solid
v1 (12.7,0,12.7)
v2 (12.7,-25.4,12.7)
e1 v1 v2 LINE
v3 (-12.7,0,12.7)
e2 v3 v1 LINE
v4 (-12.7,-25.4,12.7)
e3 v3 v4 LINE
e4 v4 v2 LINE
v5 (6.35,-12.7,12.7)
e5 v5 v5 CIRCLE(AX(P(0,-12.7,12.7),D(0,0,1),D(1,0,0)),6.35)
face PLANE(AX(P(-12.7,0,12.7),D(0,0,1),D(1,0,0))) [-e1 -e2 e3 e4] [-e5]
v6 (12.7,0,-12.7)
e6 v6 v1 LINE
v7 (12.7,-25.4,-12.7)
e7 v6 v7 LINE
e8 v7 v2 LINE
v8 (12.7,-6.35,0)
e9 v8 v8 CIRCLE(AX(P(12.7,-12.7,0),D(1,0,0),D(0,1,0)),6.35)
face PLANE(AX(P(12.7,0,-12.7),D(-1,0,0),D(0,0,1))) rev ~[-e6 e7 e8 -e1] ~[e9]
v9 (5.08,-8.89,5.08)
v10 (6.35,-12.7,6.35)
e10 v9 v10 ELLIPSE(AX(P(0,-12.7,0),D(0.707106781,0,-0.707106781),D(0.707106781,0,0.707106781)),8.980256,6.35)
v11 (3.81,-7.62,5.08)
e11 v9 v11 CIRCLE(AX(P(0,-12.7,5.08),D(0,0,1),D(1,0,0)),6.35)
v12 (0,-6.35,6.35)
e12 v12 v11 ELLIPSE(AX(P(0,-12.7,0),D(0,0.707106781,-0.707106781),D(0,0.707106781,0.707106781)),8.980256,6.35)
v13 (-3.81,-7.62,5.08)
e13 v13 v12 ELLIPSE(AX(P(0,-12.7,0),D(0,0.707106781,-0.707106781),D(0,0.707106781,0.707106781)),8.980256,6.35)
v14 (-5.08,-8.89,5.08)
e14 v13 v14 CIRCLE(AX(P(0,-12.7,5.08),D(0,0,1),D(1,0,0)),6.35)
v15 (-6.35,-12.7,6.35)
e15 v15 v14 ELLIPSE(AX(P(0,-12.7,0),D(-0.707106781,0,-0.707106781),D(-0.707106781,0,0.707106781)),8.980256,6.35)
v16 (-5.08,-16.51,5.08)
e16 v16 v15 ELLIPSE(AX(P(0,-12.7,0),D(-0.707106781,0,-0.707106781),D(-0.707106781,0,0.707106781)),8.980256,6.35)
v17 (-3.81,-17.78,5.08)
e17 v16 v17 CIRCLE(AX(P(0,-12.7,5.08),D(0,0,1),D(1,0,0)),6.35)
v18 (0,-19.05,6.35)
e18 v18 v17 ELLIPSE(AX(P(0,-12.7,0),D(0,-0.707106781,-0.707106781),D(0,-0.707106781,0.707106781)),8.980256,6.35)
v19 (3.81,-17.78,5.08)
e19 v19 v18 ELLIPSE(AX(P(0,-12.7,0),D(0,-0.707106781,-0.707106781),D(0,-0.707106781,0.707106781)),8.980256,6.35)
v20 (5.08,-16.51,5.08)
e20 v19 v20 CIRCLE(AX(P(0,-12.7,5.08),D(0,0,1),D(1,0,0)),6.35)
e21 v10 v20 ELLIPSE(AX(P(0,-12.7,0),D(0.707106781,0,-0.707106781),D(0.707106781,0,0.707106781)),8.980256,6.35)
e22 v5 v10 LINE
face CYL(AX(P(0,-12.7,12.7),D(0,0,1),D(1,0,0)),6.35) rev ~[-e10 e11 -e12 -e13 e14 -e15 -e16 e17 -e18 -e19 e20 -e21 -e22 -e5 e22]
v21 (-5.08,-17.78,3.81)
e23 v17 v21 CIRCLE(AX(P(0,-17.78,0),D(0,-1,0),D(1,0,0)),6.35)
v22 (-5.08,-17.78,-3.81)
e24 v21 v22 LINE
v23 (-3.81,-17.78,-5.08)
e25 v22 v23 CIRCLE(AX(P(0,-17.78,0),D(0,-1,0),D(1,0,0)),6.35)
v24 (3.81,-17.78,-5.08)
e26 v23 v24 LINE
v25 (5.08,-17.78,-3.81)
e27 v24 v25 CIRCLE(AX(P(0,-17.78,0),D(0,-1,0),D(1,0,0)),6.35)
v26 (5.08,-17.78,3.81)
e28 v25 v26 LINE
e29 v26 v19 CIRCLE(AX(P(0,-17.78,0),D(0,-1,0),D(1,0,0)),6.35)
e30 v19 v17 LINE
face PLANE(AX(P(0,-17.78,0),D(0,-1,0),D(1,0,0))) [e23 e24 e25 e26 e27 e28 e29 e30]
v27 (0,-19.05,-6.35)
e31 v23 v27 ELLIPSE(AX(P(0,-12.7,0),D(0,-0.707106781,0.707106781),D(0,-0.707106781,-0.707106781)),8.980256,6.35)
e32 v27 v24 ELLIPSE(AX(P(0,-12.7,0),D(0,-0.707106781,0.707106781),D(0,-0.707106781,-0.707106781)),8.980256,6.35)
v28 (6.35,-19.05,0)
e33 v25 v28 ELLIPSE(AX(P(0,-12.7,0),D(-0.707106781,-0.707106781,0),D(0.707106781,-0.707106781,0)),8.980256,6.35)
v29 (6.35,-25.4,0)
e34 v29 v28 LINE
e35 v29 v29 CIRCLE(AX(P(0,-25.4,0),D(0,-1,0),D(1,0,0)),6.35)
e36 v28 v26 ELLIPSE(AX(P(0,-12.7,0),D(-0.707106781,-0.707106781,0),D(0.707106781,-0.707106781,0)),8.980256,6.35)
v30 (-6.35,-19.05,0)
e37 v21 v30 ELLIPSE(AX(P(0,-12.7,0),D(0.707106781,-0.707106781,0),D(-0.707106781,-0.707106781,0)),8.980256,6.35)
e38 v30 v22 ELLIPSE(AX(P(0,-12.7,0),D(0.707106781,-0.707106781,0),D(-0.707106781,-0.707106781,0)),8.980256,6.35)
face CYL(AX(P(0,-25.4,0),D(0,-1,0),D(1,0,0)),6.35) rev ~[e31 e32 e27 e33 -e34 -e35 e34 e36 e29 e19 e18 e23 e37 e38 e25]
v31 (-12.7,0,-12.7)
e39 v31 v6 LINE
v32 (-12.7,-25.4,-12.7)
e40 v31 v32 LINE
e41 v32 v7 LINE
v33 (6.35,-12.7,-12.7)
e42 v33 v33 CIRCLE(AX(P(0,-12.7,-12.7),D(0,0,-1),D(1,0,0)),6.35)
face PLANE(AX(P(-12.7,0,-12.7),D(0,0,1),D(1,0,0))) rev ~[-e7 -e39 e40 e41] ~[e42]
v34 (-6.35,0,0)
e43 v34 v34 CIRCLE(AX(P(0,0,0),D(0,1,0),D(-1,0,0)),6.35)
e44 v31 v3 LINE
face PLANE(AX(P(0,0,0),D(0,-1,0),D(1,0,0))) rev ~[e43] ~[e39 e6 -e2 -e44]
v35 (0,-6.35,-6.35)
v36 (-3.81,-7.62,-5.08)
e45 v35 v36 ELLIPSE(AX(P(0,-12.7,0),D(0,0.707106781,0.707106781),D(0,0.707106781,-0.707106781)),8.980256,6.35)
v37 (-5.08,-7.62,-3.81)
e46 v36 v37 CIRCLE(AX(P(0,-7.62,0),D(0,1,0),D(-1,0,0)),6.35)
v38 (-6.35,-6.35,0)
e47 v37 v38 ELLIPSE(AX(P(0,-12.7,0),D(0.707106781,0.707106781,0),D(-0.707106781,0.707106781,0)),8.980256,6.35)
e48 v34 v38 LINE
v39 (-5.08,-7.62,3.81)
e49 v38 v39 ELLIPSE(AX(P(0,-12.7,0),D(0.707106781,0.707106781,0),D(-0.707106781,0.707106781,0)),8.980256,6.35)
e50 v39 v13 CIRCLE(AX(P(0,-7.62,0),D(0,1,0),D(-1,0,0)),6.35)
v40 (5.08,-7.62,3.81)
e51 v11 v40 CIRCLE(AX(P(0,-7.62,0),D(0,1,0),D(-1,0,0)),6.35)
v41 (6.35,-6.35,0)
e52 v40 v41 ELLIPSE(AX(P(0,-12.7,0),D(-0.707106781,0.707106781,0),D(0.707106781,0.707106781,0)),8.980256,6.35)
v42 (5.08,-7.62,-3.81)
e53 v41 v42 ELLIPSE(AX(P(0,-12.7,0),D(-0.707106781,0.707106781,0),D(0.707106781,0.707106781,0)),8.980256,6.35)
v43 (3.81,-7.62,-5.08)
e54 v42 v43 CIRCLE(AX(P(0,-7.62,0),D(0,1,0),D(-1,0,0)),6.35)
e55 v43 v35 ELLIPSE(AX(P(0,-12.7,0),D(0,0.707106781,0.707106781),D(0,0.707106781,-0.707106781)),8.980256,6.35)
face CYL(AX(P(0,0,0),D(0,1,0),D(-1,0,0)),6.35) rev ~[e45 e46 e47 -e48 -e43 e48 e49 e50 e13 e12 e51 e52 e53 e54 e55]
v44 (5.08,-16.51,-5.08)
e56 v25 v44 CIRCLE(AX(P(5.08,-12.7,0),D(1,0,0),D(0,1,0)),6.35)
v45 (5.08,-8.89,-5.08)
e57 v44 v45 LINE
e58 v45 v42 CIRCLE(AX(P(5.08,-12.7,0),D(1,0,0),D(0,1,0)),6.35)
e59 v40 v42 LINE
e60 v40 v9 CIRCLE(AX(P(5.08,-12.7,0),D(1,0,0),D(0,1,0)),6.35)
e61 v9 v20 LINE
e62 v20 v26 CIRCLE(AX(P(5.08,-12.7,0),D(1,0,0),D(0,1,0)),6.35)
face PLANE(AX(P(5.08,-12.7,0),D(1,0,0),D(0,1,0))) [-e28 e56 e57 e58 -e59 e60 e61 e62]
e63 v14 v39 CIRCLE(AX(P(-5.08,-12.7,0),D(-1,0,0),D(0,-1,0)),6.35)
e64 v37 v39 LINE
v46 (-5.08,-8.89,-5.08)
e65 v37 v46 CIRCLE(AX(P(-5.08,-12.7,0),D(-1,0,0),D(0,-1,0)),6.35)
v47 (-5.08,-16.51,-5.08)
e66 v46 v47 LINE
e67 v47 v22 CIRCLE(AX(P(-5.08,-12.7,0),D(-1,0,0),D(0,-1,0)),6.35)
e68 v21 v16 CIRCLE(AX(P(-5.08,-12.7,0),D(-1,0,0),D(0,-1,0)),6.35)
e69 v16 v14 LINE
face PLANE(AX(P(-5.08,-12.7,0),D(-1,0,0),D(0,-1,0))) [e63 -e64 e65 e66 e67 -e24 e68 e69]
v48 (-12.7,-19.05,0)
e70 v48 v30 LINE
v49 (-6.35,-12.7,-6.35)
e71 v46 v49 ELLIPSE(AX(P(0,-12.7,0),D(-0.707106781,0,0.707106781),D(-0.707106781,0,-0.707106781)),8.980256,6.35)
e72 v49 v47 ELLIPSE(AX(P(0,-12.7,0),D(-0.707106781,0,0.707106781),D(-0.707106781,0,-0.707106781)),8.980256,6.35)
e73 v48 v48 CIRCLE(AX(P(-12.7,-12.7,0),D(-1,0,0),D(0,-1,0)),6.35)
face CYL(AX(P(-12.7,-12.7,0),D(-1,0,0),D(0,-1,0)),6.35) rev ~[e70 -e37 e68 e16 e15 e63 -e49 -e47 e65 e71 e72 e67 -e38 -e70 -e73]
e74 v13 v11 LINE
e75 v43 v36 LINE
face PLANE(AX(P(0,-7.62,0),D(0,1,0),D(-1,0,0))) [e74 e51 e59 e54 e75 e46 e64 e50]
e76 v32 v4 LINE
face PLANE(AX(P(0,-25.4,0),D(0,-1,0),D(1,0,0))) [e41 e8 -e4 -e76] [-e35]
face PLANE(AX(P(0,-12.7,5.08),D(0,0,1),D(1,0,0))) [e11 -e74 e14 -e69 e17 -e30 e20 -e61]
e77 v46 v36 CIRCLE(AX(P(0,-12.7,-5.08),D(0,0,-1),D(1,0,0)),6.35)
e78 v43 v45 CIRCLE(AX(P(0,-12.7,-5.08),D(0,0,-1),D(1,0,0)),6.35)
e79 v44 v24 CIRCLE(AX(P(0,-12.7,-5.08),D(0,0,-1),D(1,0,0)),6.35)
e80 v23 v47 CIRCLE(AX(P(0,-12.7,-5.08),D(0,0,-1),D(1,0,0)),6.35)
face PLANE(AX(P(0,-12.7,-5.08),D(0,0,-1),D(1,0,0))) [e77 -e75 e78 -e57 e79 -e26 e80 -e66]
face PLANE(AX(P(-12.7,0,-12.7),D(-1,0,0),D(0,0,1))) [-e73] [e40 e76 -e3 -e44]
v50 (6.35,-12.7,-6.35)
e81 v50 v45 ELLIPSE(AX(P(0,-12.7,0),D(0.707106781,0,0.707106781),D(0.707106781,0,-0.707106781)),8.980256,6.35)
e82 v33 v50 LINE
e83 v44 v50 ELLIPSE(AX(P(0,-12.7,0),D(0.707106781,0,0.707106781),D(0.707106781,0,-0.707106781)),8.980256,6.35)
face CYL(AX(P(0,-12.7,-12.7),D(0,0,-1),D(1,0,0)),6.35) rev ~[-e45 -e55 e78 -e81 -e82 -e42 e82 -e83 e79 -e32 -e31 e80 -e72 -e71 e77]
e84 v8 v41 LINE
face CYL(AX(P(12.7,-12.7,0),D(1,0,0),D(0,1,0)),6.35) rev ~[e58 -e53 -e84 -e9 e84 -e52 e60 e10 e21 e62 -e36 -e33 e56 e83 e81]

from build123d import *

# Parameters (mm, degrees)
F0_W      = 25.4
F0_H      = 25.4
F1_DEPTH  = 25.4
F2_R      = 6.35
F3_DEPTH  = 7.62
F4_R      = 6.35
F5_DEPTH  = 7.62
F6_R      = 6.35
F7_DEPTH  = 7.62
F8_R      = 6.35
F9_DEPTH  = 7.62
F10_R     = 6.35
F11_DEPTH = 7.62
F12_R     = 6.35
F13_DEPTH = 7.62


# Not quite as in the source:
# - a feature names something its author has since deleted; it is built from what else it names


with BuildPart() as f1:
    # F0 (on Front) → F1 (new body)
    with BuildSketch(Plane.XZ):
        Rectangle(F0_W, F0_H)
    extrude(amount=F1_DEPTH)

    # F2 (on face) → F3 (cut)
    with BuildSketch(Plane.XZ.offset(25.4)):
        Circle(F2_R)
    extrude(amount=-F3_DEPTH, mode=Mode.SUBTRACT)

    # F4 (on face) → F5 (cut)
    with BuildSketch(Plane(origin=(0, 0, 0), x_dir=(-1, 0, 0), z_dir=(0, 1, 0))):
        Circle(F4_R)
    extrude(amount=-F5_DEPTH, mode=Mode.SUBTRACT)

    # F6 (on face) → F7 (cut)
    with BuildSketch(Plane.YZ.offset(12.7)):
        with Locations((-12.7, 0)):
            Circle(F6_R)
    extrude(amount=-F7_DEPTH, mode=Mode.SUBTRACT)

    # F8 (on face) → F9 (cut)
    with BuildSketch(Plane(origin=(-12.7, 0, 0), x_dir=(0, -1, 0), z_dir=(-1, 0, 0))):
        with Locations((12.7, 0)):
            Circle(F8_R)
    extrude(amount=-F9_DEPTH, mode=Mode.SUBTRACT)

    # F10 (on face) → F11 (cut)
    with BuildSketch(Plane.XY.offset(12.7)):
        with Locations((0, -12.7)):
            Circle(F10_R)
    extrude(amount=-F11_DEPTH, mode=Mode.SUBTRACT)

    # F12 (on face) → F13 (cut)
    with BuildSketch(Plane(origin=(0, 0, -12.7), x_dir=(1, 0, 0), z_dir=(0, 0, -1))):
        with Locations((0, 12.7)):
            Circle(F12_R)
    extrude(amount=-F13_DEPTH, mode=Mode.SUBTRACT)


solid = f1.part
